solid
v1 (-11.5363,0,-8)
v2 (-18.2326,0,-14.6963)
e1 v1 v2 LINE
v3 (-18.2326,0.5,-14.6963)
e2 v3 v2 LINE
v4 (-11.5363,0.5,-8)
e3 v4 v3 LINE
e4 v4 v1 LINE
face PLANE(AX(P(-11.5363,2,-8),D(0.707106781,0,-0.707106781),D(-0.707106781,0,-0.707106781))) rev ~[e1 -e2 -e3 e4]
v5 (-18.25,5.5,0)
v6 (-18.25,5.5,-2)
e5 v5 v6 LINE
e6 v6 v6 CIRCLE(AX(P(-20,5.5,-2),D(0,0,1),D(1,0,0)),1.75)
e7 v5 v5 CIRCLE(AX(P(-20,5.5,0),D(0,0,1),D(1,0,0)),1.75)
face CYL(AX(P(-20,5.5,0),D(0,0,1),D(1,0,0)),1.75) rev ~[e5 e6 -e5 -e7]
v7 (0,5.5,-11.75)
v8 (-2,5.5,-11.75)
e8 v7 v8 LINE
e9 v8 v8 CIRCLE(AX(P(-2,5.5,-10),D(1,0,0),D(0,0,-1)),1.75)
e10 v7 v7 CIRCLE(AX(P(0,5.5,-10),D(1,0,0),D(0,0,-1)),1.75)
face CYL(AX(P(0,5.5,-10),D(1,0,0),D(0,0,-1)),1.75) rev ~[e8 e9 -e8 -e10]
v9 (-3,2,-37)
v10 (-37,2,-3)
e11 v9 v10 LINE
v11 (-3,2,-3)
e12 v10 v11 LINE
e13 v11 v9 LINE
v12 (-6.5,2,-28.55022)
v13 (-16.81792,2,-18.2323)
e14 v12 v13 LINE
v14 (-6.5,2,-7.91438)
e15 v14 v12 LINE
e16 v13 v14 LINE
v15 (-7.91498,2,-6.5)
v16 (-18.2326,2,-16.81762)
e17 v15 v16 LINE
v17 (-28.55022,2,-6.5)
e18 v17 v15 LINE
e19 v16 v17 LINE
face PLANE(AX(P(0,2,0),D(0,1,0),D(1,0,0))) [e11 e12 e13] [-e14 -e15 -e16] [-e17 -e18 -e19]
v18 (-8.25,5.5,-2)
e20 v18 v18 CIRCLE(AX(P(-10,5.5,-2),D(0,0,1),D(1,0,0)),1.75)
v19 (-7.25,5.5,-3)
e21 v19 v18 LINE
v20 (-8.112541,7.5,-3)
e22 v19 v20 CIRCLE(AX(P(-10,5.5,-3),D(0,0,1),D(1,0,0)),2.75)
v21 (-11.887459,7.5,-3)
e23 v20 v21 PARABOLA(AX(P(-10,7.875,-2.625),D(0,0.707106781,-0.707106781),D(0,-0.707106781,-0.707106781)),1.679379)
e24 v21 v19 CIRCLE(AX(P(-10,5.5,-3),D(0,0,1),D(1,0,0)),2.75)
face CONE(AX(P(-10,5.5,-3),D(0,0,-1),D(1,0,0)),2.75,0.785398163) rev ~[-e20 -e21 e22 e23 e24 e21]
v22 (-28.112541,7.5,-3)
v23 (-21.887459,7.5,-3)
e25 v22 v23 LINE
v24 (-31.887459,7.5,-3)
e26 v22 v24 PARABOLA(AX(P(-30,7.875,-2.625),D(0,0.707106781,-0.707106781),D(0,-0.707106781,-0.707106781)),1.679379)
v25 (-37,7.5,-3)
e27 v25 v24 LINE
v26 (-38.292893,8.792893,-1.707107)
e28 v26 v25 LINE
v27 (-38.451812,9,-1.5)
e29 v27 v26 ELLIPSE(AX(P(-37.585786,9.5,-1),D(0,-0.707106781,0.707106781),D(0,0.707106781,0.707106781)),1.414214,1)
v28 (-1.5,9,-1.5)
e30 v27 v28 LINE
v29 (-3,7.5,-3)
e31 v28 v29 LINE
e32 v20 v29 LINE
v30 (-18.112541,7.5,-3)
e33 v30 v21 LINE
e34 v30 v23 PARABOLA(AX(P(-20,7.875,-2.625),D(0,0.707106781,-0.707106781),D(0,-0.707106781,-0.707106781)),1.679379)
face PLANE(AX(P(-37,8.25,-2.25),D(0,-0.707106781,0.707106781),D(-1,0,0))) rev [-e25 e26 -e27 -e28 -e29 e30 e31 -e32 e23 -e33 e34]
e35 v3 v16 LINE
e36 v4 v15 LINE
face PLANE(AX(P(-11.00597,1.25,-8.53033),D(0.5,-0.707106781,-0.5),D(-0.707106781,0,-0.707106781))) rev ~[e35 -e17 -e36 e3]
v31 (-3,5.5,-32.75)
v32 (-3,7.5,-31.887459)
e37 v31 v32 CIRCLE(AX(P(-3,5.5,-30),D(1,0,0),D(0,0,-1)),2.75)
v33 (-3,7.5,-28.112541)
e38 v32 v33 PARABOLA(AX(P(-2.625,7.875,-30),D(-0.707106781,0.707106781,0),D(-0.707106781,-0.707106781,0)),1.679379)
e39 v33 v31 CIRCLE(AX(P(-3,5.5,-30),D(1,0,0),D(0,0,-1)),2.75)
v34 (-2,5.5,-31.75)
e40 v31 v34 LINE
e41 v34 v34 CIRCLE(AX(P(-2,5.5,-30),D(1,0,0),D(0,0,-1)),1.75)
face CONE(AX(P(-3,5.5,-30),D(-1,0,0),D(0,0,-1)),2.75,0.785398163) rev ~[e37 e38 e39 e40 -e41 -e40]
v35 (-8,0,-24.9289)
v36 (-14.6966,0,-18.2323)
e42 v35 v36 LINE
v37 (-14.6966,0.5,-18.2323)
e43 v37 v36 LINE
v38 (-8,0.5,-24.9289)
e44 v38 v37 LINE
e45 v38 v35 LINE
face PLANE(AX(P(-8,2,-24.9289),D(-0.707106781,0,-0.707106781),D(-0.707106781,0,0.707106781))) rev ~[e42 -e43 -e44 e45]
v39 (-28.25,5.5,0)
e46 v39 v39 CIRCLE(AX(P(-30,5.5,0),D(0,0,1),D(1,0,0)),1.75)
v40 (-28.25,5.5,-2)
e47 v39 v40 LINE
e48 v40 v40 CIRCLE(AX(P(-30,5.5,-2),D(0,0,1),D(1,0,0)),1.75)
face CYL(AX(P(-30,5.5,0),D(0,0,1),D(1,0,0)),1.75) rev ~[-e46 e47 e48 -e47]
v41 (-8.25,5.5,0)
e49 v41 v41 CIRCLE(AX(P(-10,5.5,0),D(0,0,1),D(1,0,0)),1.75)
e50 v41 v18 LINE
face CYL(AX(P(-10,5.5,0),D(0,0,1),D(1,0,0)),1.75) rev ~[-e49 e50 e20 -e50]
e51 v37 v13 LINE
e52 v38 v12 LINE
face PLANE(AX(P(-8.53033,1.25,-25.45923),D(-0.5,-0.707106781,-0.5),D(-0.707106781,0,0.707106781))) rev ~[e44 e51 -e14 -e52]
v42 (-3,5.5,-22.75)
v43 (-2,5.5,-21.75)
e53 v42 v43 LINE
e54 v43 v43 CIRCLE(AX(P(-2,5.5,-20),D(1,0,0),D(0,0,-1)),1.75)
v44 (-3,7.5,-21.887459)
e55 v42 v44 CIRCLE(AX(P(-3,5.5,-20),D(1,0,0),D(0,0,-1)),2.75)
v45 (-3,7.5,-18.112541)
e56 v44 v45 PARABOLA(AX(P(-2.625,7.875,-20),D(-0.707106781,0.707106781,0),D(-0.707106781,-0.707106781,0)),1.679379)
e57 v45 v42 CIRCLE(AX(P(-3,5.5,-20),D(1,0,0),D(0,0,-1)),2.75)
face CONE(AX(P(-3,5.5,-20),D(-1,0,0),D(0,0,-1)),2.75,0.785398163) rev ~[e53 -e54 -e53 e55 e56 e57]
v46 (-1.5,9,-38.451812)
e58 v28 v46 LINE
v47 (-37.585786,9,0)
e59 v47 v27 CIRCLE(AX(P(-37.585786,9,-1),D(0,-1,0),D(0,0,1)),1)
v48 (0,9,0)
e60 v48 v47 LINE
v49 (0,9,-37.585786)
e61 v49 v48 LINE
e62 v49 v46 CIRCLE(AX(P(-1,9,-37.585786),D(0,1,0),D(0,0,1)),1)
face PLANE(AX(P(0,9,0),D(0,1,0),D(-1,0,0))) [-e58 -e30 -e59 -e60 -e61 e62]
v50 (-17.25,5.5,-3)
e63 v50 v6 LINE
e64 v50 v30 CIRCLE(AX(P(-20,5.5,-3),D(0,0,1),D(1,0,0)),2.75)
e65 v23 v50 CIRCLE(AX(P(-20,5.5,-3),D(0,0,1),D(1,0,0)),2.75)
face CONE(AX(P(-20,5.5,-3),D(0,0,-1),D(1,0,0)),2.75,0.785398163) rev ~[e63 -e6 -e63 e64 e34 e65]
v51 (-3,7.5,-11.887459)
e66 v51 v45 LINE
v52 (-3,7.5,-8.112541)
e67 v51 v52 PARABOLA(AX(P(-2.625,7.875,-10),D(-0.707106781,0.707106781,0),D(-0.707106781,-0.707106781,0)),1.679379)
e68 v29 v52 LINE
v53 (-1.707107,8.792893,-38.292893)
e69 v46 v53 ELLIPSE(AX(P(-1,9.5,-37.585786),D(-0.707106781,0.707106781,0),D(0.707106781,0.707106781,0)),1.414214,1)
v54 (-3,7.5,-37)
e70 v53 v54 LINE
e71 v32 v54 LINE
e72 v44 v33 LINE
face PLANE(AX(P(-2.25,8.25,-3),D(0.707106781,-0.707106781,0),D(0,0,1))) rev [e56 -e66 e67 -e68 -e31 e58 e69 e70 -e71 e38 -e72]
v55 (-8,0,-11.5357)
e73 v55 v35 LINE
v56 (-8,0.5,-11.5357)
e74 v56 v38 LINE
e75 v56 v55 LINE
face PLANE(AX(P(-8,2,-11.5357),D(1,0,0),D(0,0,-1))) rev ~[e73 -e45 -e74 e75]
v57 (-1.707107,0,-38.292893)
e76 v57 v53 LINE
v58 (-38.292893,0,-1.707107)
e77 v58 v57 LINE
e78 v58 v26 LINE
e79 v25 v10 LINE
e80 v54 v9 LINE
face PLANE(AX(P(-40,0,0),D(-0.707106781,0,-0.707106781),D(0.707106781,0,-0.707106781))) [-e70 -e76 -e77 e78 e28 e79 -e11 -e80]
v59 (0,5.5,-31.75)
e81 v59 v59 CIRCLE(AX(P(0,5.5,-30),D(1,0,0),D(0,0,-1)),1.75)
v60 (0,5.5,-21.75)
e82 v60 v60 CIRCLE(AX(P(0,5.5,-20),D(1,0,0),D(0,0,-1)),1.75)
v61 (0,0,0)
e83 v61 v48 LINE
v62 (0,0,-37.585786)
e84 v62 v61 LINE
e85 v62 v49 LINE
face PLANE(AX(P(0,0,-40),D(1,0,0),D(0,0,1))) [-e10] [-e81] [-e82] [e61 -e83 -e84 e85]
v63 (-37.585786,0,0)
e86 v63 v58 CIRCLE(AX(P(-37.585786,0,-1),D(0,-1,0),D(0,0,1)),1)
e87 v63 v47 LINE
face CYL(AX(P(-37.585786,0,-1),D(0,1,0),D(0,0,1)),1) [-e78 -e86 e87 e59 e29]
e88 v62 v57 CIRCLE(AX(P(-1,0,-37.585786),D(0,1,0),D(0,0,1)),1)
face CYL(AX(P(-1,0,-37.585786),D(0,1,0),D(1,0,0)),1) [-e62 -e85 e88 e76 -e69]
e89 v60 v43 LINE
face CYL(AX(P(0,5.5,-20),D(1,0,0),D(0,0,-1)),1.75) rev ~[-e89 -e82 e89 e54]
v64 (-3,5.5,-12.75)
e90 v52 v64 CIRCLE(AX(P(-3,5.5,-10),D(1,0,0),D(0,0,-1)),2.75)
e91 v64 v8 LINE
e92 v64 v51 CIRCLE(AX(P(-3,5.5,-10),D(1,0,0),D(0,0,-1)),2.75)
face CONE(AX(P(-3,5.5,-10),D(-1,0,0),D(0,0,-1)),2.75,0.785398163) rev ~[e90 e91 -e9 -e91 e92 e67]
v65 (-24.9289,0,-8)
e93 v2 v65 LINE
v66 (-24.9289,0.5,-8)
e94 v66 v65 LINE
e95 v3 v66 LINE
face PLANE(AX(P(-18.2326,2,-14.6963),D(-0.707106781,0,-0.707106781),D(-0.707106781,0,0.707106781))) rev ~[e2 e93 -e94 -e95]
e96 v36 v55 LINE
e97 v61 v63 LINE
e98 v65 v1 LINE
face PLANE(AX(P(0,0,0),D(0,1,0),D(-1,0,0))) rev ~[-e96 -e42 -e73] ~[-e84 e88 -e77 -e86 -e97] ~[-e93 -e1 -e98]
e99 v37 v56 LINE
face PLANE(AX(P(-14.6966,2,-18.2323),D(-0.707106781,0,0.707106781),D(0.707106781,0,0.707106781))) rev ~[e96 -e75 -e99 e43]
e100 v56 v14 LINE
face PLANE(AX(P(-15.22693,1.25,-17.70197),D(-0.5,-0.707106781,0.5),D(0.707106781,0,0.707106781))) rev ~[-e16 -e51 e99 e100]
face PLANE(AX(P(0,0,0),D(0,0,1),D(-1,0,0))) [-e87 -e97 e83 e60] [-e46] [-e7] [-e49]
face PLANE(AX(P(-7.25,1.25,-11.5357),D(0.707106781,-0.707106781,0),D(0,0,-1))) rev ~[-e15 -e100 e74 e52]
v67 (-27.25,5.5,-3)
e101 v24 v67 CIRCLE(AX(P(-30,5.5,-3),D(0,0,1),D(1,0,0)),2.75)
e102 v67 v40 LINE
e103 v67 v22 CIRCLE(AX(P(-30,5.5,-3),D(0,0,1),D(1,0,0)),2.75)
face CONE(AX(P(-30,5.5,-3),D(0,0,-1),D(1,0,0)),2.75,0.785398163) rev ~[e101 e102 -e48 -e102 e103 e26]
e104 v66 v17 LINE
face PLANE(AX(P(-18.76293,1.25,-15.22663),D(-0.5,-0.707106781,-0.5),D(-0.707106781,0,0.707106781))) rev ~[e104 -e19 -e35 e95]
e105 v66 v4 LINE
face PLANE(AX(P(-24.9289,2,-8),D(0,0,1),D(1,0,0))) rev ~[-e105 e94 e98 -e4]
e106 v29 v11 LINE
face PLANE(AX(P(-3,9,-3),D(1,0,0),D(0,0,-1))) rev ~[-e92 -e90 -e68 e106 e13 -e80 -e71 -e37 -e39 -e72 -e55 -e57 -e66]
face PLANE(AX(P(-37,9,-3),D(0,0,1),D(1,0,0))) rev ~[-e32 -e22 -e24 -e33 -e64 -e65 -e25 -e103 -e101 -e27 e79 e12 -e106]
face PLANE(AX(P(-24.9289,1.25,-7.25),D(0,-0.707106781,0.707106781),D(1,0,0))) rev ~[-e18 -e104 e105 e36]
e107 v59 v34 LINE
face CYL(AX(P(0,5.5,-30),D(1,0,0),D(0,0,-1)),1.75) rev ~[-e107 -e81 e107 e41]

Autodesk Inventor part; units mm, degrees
ref_plane "YZ Plane" through (0, 0, 0) normal (1, 0, 0) x (0, 1, 0)
ref_plane "XZ Plane" through (0, 0, 0) normal (0, 1, 0) x (-1, 0, 0)
ref_plane "XY Plane" through (0, 0, 0) normal (0, 0, 1) x (1, 0, 0)
sketch "Sketch1" plane through (0, 0, 0) normal (0, 1, 0) x (-1, 0, 0)
  line L0 (0, 0) -> (40, 0)
  line L1 (40, 0) -> (0, -40)
  line L2 (0, -40) -> (0, 0)
  dimension "d0" = 40
  dimension "d1" = 40
extrude "Extrusion1" add sketch "Sketch1" along normal blind 9
sketch "Sketch2" plane through (0, 9, 0) normal (0, 1, 0) x (1, 0, 0)
  line L0 (-37, 3) -> (-3, 3)
  line L1 (-3, 3) -> (-3, 37)
  line L2 (-3, 37) -> (-37, 3)
  line L3 (0, 0) -> (0, 40) projected
  line L4 (-40, 0) -> (0, 0) projected
  line L5 (0, 40) -> (-40, 0) projected
  dimension "d4" = 3
  dimension "d5" = 3
extrude "Extrusion2" cut sketch "Sketch2" against normal blind 7 contours L2 L1 L0
sketch "Sketch3" plane through (0, 2, 0) normal (0, 1, 0) x (1, 0, 0)
  line L0 (-24.9289, 8) -> (-11.5363, 8)
  line L1 (-11.5363, 8) -> (-18.2326, 14.6963)
  line L2 (-18.2326, 14.6963) -> (-24.9289, 8)
  line L3 (-37, 3) -> (-3, 37) projected
  line L4 (-3, 3) -> (-37, 3) projected
  line L5 (-8, 11.5357) -> (-8, 24.9289)
  line L6 (-8, 24.9289) -> (-14.6966, 18.2323)
  line L7 (-14.6966, 18.2323) -> (-8, 11.5357)
  line L8 (-3, 37) -> (-3, 3) projected
  line L9 (-40, 0) -> (0, 0) projected
  line L10 (0, 0) -> (0, 40) projected
  dimension "d8" = 5
  dimension "d9" = 5
  dimension "d10" = 5
  dimension "d11" = 5
  dimension "d12" = 45
  dimension "d13" = 45
  dimension "d14" = 21.5415
  dimension "d16" = 9.47
extrude "Extrusion3" cut sketch "Sketch3" against normal through all contours L2 L1 L0 | L7 L6 L5
sketch "Sketch4" plane through (0, 0, 0) normal (1, 0, 0) x (0, 0, -1)
  circle A0 centre (10, 5.5) radius 1.75
  circle A1 centre (20, 5.5) radius 1.75
  line L0 (0, 0) -> (40, 0) projected
  circle A2 centre (30, 5.5) radius 1.75
  line L1 (0, 0) -> (0, 9) projected
  line L2 (40, 0) -> (40, 9) projected
  dimension "d19" = 3.5
  dimension "d20" = 3.5
  dimension "d21" = 5.5
  dimension "d22" = 5.5
  dimension "d23" = 3.5
  dimension "d24" = 5.5
  dimension "d25" = 20
  dimension "d26" = 10
  dimension "d27" = 10
sketch "Sketch5" plane through (-40, 0, 0) normal (0, 0, 1) x (1, 0, 0)
  circle A0 centre (10, 5.5) radius 1.75
  circle A1 centre (20, 5.5) radius 1.75
  circle A2 centre (30, 5.5) radius 1.75
  line L0 (0, 0) -> (40, 0) projected
  line L1 (40, 0) -> (40, 9) projected
  line L2 (0, 0) -> (0, 9) projected
  dimension "d30" = 3.5
  dimension "d31" = 3.5
  dimension "d32" = 3.5
  dimension "d33" = 5.5
  dimension "d34" = 5.5
  dimension "d35" = 10
  dimension "d36" = 5.5
  dimension "d37" = 20
  dimension "d38" = 10
extrude "Extrusion6" cut sketch "Sketch4" against normal through all
extrude "Extrusion7" cut sketch "Sketch5" against normal through all
fillet "Fillet1" radius 1 2 edges at (0, 4.5, -40) (-40, 4.5, 0)
chamfer "Chamfer1" distance 1.5 angle 45 8 edges at (-21.5808, 2, -11.3482) (-18.2326, 2, -8) (-14.8845, 2, -11.3482) (-11.3483, 2, -14.884) (-11.3483, 2, -21.5806) (-8, 2, -18.2323) (-20, 9, -3) (-3, 9, -20)
chamfer "Chamfer2" distance 1 angle 45 6 edges at (-31.75, 5.5, -3) (-21.75, 5.5, -3) (-11.75, 5.5, -3) (-3, 5.5, -8.25) (-3, 5.5, -18.25) (-3, 5.5, -28.25)
properties part number "equerre_droite"
